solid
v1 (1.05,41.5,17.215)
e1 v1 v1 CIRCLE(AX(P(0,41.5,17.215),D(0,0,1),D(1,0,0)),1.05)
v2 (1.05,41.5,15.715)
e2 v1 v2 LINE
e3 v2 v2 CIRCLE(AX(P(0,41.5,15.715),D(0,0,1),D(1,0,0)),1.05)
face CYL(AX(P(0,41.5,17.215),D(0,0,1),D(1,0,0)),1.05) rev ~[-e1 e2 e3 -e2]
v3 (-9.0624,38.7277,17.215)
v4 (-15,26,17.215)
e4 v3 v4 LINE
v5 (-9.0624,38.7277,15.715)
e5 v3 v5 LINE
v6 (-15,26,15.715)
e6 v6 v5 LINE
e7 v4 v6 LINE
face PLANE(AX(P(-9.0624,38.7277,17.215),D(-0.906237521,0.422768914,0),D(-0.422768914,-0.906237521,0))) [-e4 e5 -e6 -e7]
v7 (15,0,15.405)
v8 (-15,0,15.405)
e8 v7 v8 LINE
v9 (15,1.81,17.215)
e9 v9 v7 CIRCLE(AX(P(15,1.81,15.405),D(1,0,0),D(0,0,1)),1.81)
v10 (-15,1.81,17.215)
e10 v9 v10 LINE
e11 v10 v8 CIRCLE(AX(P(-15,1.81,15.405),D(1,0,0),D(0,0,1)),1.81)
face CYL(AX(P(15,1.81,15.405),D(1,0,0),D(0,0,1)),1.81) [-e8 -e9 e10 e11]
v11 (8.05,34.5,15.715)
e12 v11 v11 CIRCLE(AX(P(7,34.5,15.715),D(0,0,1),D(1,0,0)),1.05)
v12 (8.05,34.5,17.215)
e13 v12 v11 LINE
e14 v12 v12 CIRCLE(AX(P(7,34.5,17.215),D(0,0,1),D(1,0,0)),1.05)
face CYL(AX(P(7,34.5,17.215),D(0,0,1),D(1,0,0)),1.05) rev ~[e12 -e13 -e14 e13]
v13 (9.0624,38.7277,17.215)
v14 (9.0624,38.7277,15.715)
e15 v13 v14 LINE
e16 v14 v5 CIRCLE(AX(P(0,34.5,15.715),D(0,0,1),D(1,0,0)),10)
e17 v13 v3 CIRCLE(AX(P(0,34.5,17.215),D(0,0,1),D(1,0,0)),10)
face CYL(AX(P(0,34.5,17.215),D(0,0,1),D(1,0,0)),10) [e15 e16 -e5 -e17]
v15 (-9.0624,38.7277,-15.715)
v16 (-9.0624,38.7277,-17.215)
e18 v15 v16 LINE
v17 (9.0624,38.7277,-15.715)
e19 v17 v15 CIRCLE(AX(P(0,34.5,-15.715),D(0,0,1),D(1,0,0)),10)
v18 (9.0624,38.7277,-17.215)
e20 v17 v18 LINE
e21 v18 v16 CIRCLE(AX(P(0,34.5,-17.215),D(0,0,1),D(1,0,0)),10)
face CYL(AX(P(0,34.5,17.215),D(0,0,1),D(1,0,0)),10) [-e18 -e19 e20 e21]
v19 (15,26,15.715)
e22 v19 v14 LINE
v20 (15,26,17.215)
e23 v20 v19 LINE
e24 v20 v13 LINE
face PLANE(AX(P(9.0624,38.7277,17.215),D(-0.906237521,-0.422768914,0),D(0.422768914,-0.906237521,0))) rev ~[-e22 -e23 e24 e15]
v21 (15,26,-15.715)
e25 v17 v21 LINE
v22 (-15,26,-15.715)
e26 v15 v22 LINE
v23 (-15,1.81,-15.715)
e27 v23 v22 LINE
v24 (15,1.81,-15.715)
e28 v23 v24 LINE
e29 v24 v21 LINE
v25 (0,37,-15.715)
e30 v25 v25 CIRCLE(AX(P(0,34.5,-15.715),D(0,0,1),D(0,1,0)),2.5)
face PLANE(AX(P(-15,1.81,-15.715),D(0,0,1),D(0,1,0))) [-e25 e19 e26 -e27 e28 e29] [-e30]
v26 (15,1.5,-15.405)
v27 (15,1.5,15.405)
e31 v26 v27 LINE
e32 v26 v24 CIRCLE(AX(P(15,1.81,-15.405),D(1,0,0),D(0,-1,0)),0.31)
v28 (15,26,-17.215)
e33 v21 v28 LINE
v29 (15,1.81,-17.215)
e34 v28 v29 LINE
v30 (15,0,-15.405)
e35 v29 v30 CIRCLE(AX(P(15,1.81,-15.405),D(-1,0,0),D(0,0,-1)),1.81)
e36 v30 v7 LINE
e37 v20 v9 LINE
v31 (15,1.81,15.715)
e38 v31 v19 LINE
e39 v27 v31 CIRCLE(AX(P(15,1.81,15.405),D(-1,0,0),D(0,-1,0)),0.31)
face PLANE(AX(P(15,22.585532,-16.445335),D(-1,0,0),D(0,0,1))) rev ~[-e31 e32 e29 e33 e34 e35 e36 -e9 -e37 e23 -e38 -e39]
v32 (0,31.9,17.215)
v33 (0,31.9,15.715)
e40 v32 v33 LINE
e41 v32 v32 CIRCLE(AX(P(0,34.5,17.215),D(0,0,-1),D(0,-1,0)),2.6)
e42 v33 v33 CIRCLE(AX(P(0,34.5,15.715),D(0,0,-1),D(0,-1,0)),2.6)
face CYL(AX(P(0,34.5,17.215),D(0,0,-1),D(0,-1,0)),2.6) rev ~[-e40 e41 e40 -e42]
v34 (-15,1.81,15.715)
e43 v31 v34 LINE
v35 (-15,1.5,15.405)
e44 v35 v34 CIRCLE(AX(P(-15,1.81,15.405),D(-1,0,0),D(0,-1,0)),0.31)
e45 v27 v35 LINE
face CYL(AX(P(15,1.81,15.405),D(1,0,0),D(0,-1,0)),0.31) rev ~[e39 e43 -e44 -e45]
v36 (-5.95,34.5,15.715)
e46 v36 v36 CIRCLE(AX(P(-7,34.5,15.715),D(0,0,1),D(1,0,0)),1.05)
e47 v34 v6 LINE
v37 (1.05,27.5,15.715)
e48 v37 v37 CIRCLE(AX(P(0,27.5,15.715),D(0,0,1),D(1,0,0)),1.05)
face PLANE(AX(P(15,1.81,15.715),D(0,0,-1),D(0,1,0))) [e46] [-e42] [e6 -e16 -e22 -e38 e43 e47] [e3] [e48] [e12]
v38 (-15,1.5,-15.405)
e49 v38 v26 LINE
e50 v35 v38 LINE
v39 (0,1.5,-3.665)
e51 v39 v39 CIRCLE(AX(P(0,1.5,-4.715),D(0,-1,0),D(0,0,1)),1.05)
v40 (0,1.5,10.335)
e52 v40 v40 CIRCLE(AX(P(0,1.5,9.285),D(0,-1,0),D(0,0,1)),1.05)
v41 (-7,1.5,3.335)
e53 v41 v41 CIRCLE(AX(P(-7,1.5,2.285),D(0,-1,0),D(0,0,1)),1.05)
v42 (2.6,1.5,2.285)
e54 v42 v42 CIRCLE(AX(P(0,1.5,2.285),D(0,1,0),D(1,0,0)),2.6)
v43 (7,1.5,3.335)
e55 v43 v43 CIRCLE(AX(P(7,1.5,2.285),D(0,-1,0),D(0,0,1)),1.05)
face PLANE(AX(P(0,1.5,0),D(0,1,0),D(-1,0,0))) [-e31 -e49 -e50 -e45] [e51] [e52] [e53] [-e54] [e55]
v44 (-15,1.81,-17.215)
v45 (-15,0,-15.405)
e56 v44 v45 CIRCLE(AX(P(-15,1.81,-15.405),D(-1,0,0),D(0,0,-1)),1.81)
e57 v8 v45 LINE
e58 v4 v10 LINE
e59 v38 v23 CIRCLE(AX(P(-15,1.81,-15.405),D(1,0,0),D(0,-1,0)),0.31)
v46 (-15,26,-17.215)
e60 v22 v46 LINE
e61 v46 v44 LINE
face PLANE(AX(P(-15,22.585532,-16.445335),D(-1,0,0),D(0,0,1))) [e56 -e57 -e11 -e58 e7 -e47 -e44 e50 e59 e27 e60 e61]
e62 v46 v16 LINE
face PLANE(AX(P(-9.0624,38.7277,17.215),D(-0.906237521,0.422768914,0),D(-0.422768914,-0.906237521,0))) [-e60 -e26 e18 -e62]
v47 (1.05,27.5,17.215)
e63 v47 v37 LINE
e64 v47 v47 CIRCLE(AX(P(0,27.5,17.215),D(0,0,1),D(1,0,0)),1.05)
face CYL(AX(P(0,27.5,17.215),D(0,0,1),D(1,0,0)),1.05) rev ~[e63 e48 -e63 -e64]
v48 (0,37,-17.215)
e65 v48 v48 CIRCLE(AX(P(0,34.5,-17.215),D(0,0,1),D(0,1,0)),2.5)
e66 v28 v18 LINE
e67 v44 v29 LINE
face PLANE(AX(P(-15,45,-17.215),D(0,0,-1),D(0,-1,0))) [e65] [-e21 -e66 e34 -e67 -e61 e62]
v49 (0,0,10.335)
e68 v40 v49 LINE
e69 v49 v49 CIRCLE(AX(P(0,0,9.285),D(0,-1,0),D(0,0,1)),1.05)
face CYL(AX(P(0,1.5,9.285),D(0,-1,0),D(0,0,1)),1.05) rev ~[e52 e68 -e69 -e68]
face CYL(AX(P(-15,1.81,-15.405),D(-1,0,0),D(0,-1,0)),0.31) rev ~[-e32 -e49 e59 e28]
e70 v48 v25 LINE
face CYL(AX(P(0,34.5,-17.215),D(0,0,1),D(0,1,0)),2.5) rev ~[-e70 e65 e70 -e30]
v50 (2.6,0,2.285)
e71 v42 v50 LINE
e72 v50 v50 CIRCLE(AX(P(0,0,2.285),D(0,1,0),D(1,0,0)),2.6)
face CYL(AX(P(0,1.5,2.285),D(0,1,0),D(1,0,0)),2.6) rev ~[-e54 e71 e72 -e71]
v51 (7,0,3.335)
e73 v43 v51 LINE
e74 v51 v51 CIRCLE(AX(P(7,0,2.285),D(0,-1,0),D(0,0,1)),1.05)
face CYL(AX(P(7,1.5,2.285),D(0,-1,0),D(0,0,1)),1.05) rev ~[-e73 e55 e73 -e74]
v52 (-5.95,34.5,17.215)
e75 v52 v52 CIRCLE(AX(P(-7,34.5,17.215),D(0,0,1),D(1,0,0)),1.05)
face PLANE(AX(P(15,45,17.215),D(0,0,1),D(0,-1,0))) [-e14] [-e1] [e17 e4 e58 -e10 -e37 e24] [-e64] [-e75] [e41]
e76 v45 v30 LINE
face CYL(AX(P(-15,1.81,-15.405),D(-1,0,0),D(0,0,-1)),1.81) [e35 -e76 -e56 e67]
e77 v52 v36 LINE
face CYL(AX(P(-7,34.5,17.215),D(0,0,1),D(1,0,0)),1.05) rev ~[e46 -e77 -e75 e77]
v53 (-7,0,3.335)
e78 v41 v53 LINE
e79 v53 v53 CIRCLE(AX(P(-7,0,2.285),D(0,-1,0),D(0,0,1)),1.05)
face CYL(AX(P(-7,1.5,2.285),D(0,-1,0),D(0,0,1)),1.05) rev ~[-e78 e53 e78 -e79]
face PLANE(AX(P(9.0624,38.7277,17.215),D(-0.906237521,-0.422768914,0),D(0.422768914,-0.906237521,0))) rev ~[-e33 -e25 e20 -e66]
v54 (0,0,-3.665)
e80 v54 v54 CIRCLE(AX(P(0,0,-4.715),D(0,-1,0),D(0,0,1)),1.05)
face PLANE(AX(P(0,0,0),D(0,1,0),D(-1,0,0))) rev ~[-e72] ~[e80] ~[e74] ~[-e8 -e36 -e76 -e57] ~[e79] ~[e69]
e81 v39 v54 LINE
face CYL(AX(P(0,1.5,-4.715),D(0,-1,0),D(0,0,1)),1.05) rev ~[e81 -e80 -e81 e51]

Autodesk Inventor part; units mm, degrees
ref_plane "YZ Plane" through (0, 0, 0) normal (1, 0, 0) x (0, 1, 0)
ref_plane "XZ Plane" through (0, 0, 0) normal (0, 1, 0) x (-1, 0, 0)
ref_plane "XY Plane" through (0, 0, 0) normal (0, 0, 1) x (1, 0, 0)
sketch "Sketch1" plane through (0, 0, 0) normal (0, 1, 0) x (-1, 0, 0)
  line L0 (15, -15.715) -> (-15, -15.715)
  line L1 (-15, -15.715) -> (-15, 15.715)
  line L2 (-15, 15.715) -> (15, 15.715)
  line L3 (15, 15.715) -> (15, -15.715)
  point P0 (0, 0)
  dimension "d0" = 30
  dimension "d1" = 31.43
  dimension "d2" = 15
  dimension "d3" = 15.715
extrude "Plate1" add sketch "Sketch1" along normal blind 1.5
sketch "Sketch2" plane through (15, 0, 17.215) normal (0, 0, -1) x (-1, 0, 0)
  line L0 (30, 0) -> (0, 0)
  line L1 (0, 0) -> (0, 45)
  line L2 (0, 45) -> (30, 45)
  line L3 (30, 45) -> (30, 0)
edge flange "Flange1" height 45 angle 90 thickness 1.5 bend radius 0.31 thickness toward (0, 0, -1) relief tear relief width 1.5 relief depth 0.75 edges at (0, 1.5, 15.715) wall of the first edge with corners at (-15, 0, 17.215) (15, 0, 17.215) (15, 45, 17.215) (-15, 45, 17.215)
bend "Bend1"
corner "Corner1"
sketch "Sketch3" plane through (-15, 0, -17.215) normal (0, 0, 1) x (1, 0, 0)
  line L0 (30, 0) -> (0, 0)
  line L1 (0, 0) -> (0, 45)
  line L2 (0, 45) -> (30, 45)
  line L3 (30, 45) -> (30, 0)
edge flange "Flange2" height 45 angle 90 thickness 1.5 bend radius 0.31 thickness toward (0, 0, 1) relief tear relief width 1.5 relief depth 0.75 edges at (0, 1.5, -15.715) wall of the first edge with corners at (15, 0, -17.215) (-15, 0, -17.215) (-15, 45, -17.215) (15, 45, -17.215)
bend "Bend2"
corner "Corner2"
sketch "Sketch6" plane through (-15, 45, 17.215) normal (0, 0, 1) x (1, 0, 0)
  circle A0 centre (15, -10.5) radius 10
  line L0 (5, -10.5) -> (5, 9.5)
  line L1 (5, 9.5) -> (25, 9.5)
  line L2 (25, 9.5) -> (25, -10.5)
  line L3 (0, 0) -> (30, 0) projected
  line L4 (0, -43.19) -> (0, 0) projected
  line L5 (5.9376, -6.2723) -> (0, -19)
  line L6 (24.0624, -6.2723) -> (30, -19)
  line L7 (30, -45) -> (0, -45) projected
  line L8 (30, 0) -> (30, -43.19) projected
  point P0 (15, -45)
  point P1 (25, 0)
  point P2 (5, -8.2822)
  point P3 (5, 0)
  point P4 (30, -19)
  point P5 (25, -8.2822)
  dimension "d39" = 34.5
  dimension "d40" = 20
  dimension "d41" = 20
  dimension "d42" = 20
  dimension "d43" = 20
  dimension "d45" = 15
  dimension "d48" = 26
  dimension "d49" = 26
  dimension "d50" = 0
extrude "Extrusion1" cut sketch "Sketch6" against normal blind 50 contours A0 L5 L0 L3 L2 L6 | L2 L3 L8 L6 | L5 L4 L3 L0
sketch "Sketch7" plane through (-15, 1.81, 17.215) normal (0, 0, 1) x (1, 0, 0)
  arc A0 (24.0624, 36.9177) -> (5.9376, 36.9177) centre (15, 32.69) ccw projected
  circle A1 centre (22, 32.69) radius 1.05
  circle A2 centre (15, 39.69) radius 1.05
  circle A3 centre (8, 32.69) radius 1.05
  circle A4 centre (15, 25.69) radius 1.05
  point P0 (15, -1.81)
  dimension "d51" = 7
  dimension "d52" = 2.1
  dimension "d55" = 360
extrude "Extrusion2" cut sketch "Sketch7" against normal blind 20
sketch "Sketch8" plane through (0, 1.5, 0) normal (0, 1, 0) x (1, 0, 0)
  line L0 (15, 15.715) -> (9.0624, 15.715) projected
  line L1 (9.0624, 15.715) -> (-9.0624, 15.715) projected
  line L2 (-9.0624, 15.715) -> (-15, 15.715) projected
  line L3 (-15, 15.715) -> (15, 15.715) projected
  circle A0 centre (0, -2.285) radius 2.6
  point P0 (0, 0)
  point P1 (7, -2.285)
  point P2 (0, 4.715)
  point P3 (-7, -2.285)
  point P4 (0, -9.285)
  dimension "d59" = 18
  dimension "d60" = 0
  dimension "d61" = 5.2
  dimension "d62" = 7
  dimension "d63" = 0
  dimension "d66" = 360
extrude "Extrusion3" cut sketch "Sketch8" against normal blind 10
sketch "Sketch9" plane through (0, 1.5, 0) normal (0, 1, 0) x (1, 0, 0)
  point P0 (0, 0)
hole "Hole3" at (0, 1.5, -4.715) at (7, 1.5, 2.285) at (-7, 1.5, 2.285) at (0, 1.5, 9.285) direction (0, -1, 0) diameter 2.1 depth 1.5
hole "Hole4" at (0, 34.5, 17.215) direction (0, 0, -1) diameter 5.2 depth 1.5 clearance for "Hex Head Bolt" size "M5" standard "Ansi Metric M Profile"
sketch "Sketch10" plane through (15, 1.81, -17.215) normal (0, 0, -1) x (-1, 0, 0)
  circle A0 centre (15, 32.69) radius 2.6 projected
  point P0 (15, -1.81)
hole "Hole5" at (0, 34.5, -17.215) direction (0, 0, 1) diameter 5 depth 1.5 clearance for "Hex Head Bolt" size "M5" standard "Ansi Metric M Profile"
equation "\"d75\" = Thickness"
equation "\"d82\" = Thickness"
equation "\"d89\" = Thickness"
equation "\"d4\" = Thickness"
equation "\"d5\" = BendReliefWidth"
equation "\"d6\" = BendReliefDepth"
equation "\"d7\" = MinimumRemnant"
equation "\"d8\" = TransitionRadius"
equation "\"d11\" = BendRadius"
equation "\"d12\" = CornerReliefSize"
equation "\"d13\" = GapSize"
equation "\"d14\" = JacobiRadiusSize"
equation "\"d15\" = BendReliefWidth"
equation "\"d16\" = BendReliefDepth"
equation "\"d17\" = MinimumRemnant"
equation "\"d18\" = TransitionRadius"
equation "\"d21\" = BendRadius"
equation "\"d22\" = CornerReliefSize"
equation "\"d23\" = GapSize"
equation "\"d24\" = JacobiRadiusSize"
equation "\"BendReliefWidth\" = Thickness"
equation "\"BendReliefDepth\" = 0.5 * Thickness"
equation "\"CornerReliefSize\" = 4 * Thickness"
equation "\"MinimumRemnant\" = 2 * Thickness"
equation "\"TransitionRadius\" = BendRadius"
equation "\"JacobiRadiusSize\" = BendRadius"
equation "\"GapSize\" = Thickness"
equation "\"Thickness\" = 1.5"
equation "\"BendRadius\" = 0.31"
properties part number "axis_7_top_frame" material "Aluminum 6061-AHC"
